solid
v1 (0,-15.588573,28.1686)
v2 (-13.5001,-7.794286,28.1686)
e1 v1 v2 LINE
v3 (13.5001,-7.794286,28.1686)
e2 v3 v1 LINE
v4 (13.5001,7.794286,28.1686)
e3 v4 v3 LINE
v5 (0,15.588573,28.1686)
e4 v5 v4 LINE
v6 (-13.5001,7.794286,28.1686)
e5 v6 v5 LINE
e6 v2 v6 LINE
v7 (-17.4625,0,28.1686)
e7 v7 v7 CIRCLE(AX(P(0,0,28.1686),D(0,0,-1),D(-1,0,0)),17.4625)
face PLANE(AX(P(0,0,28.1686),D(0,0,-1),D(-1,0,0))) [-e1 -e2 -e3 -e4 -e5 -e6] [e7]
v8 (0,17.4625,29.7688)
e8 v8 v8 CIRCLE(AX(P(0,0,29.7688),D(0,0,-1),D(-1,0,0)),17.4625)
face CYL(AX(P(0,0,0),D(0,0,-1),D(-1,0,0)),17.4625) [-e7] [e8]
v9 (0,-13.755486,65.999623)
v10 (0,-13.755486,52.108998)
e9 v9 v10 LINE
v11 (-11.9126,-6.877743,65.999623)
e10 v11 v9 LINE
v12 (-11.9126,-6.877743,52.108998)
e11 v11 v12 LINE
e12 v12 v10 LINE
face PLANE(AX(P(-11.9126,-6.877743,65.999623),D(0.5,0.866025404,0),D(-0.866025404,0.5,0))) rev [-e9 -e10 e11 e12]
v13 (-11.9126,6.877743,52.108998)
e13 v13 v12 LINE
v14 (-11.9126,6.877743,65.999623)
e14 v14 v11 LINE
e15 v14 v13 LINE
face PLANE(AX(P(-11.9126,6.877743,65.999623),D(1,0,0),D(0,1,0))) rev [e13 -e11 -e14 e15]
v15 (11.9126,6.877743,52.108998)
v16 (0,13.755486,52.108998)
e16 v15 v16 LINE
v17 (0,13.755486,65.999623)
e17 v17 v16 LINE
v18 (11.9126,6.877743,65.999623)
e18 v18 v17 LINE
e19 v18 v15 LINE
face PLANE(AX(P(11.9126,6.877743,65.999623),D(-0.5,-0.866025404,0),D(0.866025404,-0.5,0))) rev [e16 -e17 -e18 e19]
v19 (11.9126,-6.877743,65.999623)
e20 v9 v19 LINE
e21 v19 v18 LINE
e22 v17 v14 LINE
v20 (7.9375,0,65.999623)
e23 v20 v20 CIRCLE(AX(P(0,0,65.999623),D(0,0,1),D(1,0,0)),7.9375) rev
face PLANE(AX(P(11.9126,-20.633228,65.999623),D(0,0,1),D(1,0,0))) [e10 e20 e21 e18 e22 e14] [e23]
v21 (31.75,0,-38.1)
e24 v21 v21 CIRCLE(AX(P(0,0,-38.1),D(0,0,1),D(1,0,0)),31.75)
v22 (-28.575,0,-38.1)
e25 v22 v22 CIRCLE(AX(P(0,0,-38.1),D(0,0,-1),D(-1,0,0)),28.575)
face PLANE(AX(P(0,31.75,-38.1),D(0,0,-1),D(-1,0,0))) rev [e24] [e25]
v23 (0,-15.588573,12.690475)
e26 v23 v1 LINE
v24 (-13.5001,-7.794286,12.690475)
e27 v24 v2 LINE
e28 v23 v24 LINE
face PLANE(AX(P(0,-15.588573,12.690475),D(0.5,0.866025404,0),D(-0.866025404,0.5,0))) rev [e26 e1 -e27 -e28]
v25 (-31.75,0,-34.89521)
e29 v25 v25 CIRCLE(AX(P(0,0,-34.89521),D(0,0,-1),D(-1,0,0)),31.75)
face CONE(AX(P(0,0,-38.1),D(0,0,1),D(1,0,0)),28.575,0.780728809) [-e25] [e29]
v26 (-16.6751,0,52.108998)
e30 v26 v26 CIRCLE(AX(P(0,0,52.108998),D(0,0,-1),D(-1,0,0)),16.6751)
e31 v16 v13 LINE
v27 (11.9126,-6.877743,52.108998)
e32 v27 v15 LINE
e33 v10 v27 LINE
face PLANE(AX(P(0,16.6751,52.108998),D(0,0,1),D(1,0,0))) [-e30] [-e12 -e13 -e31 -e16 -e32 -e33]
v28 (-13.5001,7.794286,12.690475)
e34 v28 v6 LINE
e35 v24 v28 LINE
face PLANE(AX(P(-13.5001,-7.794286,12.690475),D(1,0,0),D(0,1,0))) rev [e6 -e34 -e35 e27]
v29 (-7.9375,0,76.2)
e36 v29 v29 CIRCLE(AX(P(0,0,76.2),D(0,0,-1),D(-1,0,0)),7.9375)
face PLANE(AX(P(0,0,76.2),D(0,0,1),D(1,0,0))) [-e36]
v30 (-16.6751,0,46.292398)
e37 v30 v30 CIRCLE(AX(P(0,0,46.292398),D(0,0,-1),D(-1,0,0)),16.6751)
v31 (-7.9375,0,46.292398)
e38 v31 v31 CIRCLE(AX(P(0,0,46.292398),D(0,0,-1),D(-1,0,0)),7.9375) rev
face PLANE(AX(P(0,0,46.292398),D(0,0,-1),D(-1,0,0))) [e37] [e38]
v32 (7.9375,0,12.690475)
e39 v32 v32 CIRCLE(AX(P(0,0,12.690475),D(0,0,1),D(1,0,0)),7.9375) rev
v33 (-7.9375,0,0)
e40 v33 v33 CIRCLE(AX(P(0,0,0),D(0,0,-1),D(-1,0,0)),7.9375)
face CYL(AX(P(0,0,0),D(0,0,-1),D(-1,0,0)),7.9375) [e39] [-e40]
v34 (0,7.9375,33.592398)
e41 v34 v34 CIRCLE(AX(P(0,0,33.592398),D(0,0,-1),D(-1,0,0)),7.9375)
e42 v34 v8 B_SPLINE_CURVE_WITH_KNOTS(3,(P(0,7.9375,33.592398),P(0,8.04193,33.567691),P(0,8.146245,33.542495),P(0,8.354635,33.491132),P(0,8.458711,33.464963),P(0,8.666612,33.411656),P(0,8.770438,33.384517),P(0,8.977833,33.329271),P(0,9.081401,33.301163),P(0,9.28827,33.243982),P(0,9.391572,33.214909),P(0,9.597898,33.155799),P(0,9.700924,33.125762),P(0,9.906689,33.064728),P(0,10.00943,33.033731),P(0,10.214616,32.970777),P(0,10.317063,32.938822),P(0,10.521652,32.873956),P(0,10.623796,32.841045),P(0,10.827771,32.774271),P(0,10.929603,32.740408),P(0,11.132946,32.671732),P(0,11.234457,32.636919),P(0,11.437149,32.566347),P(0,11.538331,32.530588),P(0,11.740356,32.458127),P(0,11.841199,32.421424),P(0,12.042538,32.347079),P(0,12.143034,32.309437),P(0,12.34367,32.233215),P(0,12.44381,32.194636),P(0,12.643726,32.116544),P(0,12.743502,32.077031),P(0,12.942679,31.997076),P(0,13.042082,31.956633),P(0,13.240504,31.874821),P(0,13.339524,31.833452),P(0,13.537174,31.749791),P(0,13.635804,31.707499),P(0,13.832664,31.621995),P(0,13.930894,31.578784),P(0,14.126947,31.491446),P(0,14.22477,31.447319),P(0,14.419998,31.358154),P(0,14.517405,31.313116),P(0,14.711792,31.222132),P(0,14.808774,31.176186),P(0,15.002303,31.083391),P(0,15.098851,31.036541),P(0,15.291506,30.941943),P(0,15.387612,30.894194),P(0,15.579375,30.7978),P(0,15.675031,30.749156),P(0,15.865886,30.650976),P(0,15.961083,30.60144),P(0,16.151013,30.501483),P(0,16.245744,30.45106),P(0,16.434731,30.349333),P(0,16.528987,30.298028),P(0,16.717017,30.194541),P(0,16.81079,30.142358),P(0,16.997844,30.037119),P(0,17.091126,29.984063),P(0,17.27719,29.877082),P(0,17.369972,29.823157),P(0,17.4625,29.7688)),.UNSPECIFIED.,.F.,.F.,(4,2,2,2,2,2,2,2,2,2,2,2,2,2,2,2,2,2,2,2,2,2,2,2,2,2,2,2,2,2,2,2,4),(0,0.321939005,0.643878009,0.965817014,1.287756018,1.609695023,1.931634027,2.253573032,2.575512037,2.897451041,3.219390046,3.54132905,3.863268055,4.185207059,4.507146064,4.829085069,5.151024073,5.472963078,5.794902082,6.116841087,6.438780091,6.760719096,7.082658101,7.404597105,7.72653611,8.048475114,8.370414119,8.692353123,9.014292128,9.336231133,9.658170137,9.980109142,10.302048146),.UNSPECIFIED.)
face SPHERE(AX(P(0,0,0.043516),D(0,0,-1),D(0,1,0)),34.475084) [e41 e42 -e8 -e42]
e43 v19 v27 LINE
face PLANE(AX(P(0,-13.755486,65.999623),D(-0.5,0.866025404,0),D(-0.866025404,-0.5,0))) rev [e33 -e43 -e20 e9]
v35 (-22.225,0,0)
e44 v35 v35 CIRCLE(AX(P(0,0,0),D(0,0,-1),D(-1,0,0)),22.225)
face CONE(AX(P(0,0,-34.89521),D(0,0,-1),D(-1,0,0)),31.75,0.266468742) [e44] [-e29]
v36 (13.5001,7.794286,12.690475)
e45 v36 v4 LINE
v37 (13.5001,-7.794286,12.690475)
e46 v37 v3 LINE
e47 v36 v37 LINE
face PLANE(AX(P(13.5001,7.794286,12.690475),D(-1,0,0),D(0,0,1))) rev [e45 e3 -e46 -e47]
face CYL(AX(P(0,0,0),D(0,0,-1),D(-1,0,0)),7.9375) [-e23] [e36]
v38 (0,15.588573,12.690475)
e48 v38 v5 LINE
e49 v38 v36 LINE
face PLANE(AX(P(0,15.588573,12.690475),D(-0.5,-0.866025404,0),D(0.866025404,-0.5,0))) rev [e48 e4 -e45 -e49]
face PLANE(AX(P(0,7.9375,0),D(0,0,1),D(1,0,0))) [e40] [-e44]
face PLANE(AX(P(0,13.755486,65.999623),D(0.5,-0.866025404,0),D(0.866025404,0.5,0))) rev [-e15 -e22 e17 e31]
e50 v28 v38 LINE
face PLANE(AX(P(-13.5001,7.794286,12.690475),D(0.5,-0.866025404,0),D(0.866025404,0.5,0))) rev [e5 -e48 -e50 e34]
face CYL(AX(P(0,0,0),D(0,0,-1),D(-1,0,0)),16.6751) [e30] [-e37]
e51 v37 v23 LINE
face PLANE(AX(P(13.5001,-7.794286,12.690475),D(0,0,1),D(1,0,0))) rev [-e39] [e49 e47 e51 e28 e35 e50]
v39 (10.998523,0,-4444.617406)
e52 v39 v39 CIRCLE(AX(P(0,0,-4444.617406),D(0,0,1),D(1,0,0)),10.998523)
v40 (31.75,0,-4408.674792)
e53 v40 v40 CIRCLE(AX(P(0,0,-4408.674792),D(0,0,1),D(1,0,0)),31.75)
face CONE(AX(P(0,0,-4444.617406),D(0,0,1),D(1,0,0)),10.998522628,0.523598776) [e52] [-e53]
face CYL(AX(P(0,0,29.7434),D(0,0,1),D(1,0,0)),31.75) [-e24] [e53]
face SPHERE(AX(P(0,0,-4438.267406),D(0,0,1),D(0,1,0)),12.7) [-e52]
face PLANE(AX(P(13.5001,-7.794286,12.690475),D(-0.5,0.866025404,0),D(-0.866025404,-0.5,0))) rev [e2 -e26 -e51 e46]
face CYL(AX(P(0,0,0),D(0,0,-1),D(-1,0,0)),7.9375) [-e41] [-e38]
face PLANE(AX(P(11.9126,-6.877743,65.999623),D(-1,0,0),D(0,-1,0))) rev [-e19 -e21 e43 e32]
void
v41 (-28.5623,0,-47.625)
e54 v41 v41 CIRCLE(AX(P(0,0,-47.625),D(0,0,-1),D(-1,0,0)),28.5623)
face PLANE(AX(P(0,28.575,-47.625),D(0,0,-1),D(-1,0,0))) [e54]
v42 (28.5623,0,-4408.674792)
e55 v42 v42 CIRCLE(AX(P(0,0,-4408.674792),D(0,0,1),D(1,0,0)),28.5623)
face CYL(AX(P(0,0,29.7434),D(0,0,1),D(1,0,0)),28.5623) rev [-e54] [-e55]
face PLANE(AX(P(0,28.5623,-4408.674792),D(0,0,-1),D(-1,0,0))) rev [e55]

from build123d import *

# Parameters (mm, degrees)
BOSS_REVOLVE3_START         = 12.690475
BOSS_REVOLVE3_OUTLINE_R     = 7.9375
BOSS_REVOLVE3_DEPTH         = 15.478125
BOSS_REVOLVE3_START_2       = 46.292398399
BOSS_REVOLVE3_2_OUTLINE_R   = 16.6751
BOSS_REVOLVE3_2_OUTLINE_R_2 = 7.9375
BOSS_REVOLVE3_2_DEPTH       = 5.8166
BOSS_EXTRUDE2_DEPTH         = 13.890625


# Read off the part's stored shape, not the designer's step: Boss-Revolve3
with BuildPart() as part:
    # Sketch1 → Base-Revolve (revolve)
    with BuildSketch(Plane(origin=(0, 0, 0), x_dir=(0, 0, -1), z_dir=(1, 0, 0)), mode=Mode.PRIVATE) as base_revolve_sk:
        Polygon((-76.2, 0), (-76.2, 7.9375), (0, 7.9375), (0, 22.225), (34.895210283, 31.75), (38.1, 28.575), (47.625, 28.575), (47.625, 0), align=None)
    revolve(base_revolve_sk.sketch.rotate(Axis((0, 0, 0), (0, 0, 1)), 90), axis=Axis((0, 0, 0), (0, 0, 1)))

    # Sketch3 → Boss-Revolve2 (revolve)
    with BuildSketch(Plane(origin=(0, 0, 0), x_dir=(0, 0, -1), z_dir=(1, 0, 0)), mode=Mode.PRIVATE) as boss_revolve2_sk:
        with BuildLine():
            Line((-28.1686, 0), (-28.1686, 17.4625))
            Line((-28.1686, 17.4625), (-29.7688, 17.4625))
            ThreePointArc((-29.7688, 17.4625), (-33.309963658, 9.048473715), (-34.5186, 0))
            Line((-34.5186, 0), (-28.1686, 0))
        make_face()
    revolve(boss_revolve2_sk.sketch.rotate(Axis((0, 0, 0), (0, 0, 1)), 90), axis=Axis((0, 0, 0), (0, 0, 1)))

    # Sketch2 → Boss-Revolve1 (revolve)
    with BuildSketch(Plane(origin=(0, 0, 0), x_dir=(0, 0, -1), z_dir=(1, 0, 0)), mode=Mode.PRIVATE) as boss_revolve1_sk:
        with BuildLine():
            Line((38.1, 31.75), (38.1, 28.5623))
            Line((38.1, 28.5623), (4408.674792498, 28.5623))
            Line((4408.674792498, 28.5623), (4408.674792498, 0))
            Line((4408.674792498, 0), (4450.967405638, 0))
            ThreePointArc((4450.967405638, 0), (4449.265928266, 6.35), (4444.617405638, 10.998522628))
            Line((4444.617405638, 10.998522628), (4408.674792498, 31.75))
            Line((4408.674792498, 31.75), (38.1, 31.75))
        make_face()
    revolve(boss_revolve1_sk.sketch.rotate(Axis((0, 0, 29.7434), (0, 0, -1)), 90), axis=Axis((0, 0, 29.7434), (0, 0, -1)))

    # Boss-Revolve3 outline → Boss-Revolve3 (add)
    with BuildSketch(Plane.XY.offset(BOSS_REVOLVE3_START)):
        Polygon((0, -15.588572738), (13.5001, -7.794286369), (13.5001, 7.794286369), (0, 15.588572738), (-13.5001, 7.794286369), (-13.5001, -7.794286369), align=None)
        Circle(BOSS_REVOLVE3_OUTLINE_R, mode=Mode.SUBTRACT)
    extrude(amount=BOSS_REVOLVE3_DEPTH)

    # Boss-Revolve3 2 outline → Boss-Revolve3 2 (add)
    with BuildSketch(Plane.XY.offset(BOSS_REVOLVE3_START_2)):
        Circle(BOSS_REVOLVE3_2_OUTLINE_R)
        Circle(BOSS_REVOLVE3_2_OUTLINE_R_2, mode=Mode.SUBTRACT)
    extrude(amount=BOSS_REVOLVE3_2_DEPTH)

    # Sketch6 → Boss-Extrude2 (add)
    with BuildSketch(Plane.XY.offset(52.108998399)):
        Polygon((0, -13.755485633), (11.9126, -6.877742817), (11.9126, 6.877742817), (0, 13.755485633), (-11.9126, 6.877742817), (-11.9126, -6.877742817), align=None)
    extrude(amount=BOSS_EXTRUDE2_DEPTH)


solid = part.part
